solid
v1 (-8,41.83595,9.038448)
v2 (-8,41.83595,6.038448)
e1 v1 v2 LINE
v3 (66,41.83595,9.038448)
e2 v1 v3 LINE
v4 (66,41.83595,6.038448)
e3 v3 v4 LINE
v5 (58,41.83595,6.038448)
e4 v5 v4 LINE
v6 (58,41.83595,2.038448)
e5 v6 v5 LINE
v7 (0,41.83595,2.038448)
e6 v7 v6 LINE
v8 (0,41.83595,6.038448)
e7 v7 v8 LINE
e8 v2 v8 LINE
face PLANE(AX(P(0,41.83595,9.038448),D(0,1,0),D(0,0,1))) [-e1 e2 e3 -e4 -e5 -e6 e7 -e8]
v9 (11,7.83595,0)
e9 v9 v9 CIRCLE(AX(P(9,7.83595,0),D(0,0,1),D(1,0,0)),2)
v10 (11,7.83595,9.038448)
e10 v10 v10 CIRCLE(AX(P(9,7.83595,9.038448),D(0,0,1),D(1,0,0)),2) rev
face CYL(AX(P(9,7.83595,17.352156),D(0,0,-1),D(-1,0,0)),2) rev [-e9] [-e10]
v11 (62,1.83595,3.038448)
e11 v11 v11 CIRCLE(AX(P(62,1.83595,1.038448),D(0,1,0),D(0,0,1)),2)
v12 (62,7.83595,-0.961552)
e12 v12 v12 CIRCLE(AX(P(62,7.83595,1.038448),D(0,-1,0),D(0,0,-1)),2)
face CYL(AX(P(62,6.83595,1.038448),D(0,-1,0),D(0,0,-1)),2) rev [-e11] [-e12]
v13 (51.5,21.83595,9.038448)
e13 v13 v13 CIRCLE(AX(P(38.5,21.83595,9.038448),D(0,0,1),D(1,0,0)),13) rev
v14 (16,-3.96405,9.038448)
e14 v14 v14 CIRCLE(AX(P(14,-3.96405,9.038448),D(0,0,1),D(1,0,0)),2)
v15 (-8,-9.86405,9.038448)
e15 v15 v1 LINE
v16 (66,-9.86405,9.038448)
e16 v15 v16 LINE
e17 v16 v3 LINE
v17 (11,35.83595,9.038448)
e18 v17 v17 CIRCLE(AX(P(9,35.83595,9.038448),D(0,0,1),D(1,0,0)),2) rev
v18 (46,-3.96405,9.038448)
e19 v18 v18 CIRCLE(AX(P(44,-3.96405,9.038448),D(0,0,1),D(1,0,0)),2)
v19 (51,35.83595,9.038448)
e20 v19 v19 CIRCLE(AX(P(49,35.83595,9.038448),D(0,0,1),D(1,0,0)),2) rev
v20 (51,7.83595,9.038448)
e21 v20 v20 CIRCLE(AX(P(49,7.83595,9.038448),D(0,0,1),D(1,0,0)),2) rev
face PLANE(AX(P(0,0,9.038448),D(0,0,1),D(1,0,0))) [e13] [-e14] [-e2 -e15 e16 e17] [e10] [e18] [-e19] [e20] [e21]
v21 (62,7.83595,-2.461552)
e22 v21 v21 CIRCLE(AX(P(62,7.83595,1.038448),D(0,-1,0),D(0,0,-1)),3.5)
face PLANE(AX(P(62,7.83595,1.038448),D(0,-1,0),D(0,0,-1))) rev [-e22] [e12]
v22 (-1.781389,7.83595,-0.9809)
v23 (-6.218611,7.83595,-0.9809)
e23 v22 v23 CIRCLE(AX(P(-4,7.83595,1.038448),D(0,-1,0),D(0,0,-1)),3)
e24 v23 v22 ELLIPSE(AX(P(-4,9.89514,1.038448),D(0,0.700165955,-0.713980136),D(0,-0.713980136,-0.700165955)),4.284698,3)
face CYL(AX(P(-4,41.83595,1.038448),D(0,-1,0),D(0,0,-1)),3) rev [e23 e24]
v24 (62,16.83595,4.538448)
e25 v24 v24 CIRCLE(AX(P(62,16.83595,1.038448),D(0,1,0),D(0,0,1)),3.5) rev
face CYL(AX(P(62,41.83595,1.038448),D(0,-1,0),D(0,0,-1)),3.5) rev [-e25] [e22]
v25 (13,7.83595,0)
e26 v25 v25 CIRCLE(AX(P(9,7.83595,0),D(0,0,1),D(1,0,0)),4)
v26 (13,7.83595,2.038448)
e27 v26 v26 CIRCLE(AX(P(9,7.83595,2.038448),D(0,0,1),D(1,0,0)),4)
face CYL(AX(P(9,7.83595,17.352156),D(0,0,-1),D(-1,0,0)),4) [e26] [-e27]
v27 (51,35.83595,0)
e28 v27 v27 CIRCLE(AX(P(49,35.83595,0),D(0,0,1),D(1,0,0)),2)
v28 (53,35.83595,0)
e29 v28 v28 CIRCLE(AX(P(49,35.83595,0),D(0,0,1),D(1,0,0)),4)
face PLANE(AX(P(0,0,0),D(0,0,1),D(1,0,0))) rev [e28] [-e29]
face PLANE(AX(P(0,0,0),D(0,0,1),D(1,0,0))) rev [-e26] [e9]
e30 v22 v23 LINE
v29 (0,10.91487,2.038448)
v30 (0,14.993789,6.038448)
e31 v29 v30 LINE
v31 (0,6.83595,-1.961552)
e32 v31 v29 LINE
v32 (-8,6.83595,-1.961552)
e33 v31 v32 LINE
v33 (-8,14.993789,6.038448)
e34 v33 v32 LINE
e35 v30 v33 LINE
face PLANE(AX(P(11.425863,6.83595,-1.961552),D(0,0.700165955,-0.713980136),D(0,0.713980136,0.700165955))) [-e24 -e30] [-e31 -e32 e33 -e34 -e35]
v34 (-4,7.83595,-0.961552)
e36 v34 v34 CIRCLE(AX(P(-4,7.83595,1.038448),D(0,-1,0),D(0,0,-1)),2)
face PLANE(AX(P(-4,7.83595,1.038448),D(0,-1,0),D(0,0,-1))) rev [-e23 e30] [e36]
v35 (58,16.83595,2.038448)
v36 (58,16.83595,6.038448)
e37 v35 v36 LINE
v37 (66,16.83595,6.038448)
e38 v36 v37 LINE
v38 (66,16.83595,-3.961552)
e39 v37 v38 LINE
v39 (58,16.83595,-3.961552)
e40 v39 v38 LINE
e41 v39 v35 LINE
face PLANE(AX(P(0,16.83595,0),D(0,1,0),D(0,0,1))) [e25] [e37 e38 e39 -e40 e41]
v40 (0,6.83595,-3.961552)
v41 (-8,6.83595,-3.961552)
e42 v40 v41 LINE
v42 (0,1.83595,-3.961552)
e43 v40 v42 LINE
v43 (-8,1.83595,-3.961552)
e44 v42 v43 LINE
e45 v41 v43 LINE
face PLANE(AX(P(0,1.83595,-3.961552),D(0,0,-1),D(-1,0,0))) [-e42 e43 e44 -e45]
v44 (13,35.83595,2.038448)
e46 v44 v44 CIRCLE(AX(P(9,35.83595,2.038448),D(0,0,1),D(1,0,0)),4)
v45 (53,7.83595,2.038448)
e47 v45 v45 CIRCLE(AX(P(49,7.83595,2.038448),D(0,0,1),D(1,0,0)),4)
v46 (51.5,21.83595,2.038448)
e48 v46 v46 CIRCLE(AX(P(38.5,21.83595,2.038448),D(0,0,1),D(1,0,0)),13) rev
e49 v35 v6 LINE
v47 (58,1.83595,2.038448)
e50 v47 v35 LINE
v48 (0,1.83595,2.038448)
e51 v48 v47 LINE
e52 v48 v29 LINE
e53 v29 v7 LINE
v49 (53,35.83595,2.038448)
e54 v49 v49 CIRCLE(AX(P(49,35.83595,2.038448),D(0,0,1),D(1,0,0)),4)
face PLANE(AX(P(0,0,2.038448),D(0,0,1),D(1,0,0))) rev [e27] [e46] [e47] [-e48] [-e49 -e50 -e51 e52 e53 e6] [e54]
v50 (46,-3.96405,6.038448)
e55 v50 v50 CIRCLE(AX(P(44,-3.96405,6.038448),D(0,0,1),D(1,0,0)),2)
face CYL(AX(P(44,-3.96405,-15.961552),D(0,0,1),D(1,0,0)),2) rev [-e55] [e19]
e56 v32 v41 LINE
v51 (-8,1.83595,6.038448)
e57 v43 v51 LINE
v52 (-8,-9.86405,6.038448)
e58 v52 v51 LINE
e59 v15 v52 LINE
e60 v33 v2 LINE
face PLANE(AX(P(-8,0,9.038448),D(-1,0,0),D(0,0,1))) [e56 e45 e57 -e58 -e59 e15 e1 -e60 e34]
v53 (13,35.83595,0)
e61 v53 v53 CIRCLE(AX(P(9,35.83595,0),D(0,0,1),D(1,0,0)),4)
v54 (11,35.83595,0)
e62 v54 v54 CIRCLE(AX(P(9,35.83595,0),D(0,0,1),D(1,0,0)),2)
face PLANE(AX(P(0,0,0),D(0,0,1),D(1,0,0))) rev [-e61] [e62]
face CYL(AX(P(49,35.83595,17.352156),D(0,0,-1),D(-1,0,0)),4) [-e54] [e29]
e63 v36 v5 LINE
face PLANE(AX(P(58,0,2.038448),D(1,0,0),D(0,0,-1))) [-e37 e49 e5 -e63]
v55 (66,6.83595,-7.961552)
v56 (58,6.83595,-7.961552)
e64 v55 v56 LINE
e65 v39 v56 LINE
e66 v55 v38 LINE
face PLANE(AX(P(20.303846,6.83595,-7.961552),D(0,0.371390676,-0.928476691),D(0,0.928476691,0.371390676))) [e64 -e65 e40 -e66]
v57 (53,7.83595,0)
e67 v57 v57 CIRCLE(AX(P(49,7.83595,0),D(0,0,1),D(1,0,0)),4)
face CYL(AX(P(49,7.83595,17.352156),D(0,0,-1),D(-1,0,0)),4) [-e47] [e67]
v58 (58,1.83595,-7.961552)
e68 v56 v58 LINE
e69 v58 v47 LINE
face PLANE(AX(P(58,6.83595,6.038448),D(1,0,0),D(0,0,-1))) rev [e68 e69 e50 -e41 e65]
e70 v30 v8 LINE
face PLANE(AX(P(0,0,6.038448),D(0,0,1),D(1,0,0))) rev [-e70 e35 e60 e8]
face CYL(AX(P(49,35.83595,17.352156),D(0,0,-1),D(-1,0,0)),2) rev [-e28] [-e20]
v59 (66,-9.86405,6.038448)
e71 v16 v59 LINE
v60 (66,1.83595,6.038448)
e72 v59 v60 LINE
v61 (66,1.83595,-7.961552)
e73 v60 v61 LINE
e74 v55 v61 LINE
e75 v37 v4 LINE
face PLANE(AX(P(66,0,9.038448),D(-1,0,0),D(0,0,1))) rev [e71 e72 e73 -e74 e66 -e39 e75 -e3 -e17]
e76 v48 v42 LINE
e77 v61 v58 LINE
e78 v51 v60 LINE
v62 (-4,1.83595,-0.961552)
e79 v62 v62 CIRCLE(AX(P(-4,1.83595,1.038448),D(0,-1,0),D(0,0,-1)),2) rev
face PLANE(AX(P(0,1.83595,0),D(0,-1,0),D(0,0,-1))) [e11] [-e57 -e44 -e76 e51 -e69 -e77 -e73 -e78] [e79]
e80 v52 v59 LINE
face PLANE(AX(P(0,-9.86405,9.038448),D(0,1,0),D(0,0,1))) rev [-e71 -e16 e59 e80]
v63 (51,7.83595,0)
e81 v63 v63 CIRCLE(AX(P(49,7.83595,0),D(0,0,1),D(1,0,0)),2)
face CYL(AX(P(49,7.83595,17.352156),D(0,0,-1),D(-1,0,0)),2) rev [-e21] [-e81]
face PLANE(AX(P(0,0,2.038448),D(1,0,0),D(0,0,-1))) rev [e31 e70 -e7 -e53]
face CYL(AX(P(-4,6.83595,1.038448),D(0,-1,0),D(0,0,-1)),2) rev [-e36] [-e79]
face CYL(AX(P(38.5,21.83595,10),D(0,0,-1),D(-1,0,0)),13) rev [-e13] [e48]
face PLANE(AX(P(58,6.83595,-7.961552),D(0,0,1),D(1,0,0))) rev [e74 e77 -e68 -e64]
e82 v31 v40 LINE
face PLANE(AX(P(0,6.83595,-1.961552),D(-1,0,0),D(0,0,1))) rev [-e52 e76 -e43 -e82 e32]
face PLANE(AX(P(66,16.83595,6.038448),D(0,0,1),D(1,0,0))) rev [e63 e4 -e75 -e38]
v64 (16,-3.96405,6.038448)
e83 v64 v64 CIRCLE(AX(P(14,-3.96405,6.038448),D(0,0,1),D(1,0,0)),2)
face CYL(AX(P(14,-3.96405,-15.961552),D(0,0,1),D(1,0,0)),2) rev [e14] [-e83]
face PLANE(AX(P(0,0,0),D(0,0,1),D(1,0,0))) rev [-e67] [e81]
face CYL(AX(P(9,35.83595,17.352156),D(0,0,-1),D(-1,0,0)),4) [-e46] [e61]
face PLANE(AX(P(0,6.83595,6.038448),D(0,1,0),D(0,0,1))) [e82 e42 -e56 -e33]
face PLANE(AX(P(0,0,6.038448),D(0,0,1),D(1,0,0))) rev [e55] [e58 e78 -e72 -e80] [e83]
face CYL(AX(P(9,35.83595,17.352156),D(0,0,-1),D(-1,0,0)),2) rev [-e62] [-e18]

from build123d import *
from build123d.topology import SkipClean

# Parameters (mm, degrees)
SKETCH1_R               = 4
SKETCH1_R_2             = 2
BOSS_EXTRUDE2_DEPTH     = 6.038447986
BOSS_EXTRUDE2_2_DEPTH   = 6.038447986
BOSS_EXTRUDE2_3_DEPTH   = 6.038447986
BOSS_EXTRUDE2_4_DEPTH   = 6.038447986
SKETCH3_W               = 74
SKETCH3_H               = 51.7
BOSS_EXTRUDE4_DEPTH     = 3
BOSS_EXTRUDE3_START     = 11.7
SKETCH2_W               = 8
SKETCH2_H               = 8
SKETCH2_R               = 2
SKETCH2_H_2             = 14
BOSS_EXTRUDE3_DEPTH     = 5
SKETCH1_4_R             = 2
SKETCH1_4_R_2           = 13
CUT_EXTRUDE1_DEPTH      = 10
BOSS_EXTRUDE5_DEPTH     = 8
BOSS_EXTRUDE7_DEPTH     = 8
SKETCH2_2_R             = 2
CUT_EXTRUDE2_DEPTH      = 85.324276113
CUT_EXTRUDE3_START      = -6
SKETCH5_R               = 3.5
SKETCH5_R_2             = 3
CUT_EXTRUDE3_DEPTH      = 72.702596752
BOSS_EXTRUDE8_START     = -4
SKETCH3_3_W             = 58
SKETCH3_3_H             = 35
SKETCH3_3_R             = 4
SKETCH3_3_W_2           = 74
SKETCH3_3_H_2           = 5
BOSS_EXTRUDE8_DEPTH     = 4
CUT_EXTRUDE5_DEPTH      = 79.663462115
CUT_EXTRUDE5_DEPTH_BACK = 79.663462115
SKETCH1_6_R             = 13
SKETCH8_W               = 8
SKETCH8_H               = 14
SKETCH8_H_2             = 11.313736344
CUT_EXTRUDE6_DEPTH      = 25
BOSS_EXTRUDE10_START    = -8
SKETCH9_W               = 10
SKETCH9_H               = 5
BOSS_EXTRUDE10_DEPTH    = 8
SKETCH2_3_R             = 2
CUT_EXTRUDE7_DEPTH      = 25
SKETCH10_R              = 2
CUT_EXTRUDE8_DEPTH      = 25
SKETCH2_4_R             = 2
CUT_EXTRUDE9_DEPTH      = 25
SKETCH1_7_R             = 2
CUT_EXTRUDE10_DEPTH     = 25


with BuildPart() as part:
    # Sketch1 → Boss-Extrude2 (new body)
    with BuildSketch(Plane.XY):
        with Locations((49, 35.83595021)):
            Circle(SKETCH1_R)
        with Locations((49, 35.83595021)):
            Circle(SKETCH1_R_2, mode=Mode.SUBTRACT)
    extrude(amount=BOSS_EXTRUDE2_DEPTH)



with BuildPart() as body_2:
    # Sketch1 → Boss-Extrude2 2 (new body)
    with BuildSketch(Plane.XY):
        with Locations((49, 7.83595021)):
            Circle(SKETCH1_R)
        with Locations((49, 7.83595021)):
            Circle(SKETCH1_R_2, mode=Mode.SUBTRACT)
    extrude(amount=BOSS_EXTRUDE2_2_DEPTH)


with BuildPart() as body_3:
    # Sketch1 → Boss-Extrude2 3 (new body)
    with BuildSketch(Plane.XY):
        with Locations((9, 7.83595021)):
            Circle(SKETCH1_R)
        with Locations((9, 7.83595021)):
            Circle(SKETCH1_R_2, mode=Mode.SUBTRACT)
    extrude(amount=BOSS_EXTRUDE2_3_DEPTH)


with BuildPart() as body_4:
    # Sketch1 → Boss-Extrude2 4 (new body)
    with BuildSketch(Plane.XY):
        with Locations((9, 35.83595021)):
            Circle(SKETCH1_R)
        with Locations((9, 35.83595021)):
            Circle(SKETCH1_R_2, mode=Mode.SUBTRACT)
    extrude(amount=BOSS_EXTRUDE2_4_DEPTH)


with BuildPart() as part_1:
    add(part.part)

    add(body_2.part)  # Boss-Extrude4 merges body 2

    add(body_3.part)  # Boss-Extrude4 merges body 3

    add(body_4.part)  # Boss-Extrude4 merges body 4
    # Sketch3 → Boss-Extrude4 (add)
    with BuildSketch(Plane.XY.offset(6.038447986)):
        with Locations((29, 15.98595021)):
            Rectangle(SKETCH3_W, SKETCH3_H)
    extrude(amount=BOSS_EXTRUDE4_DEPTH)

    # Sketch2 → Boss-Extrude3 (add)
    # profile 1 of 2: a face of its own
    with BuildSketch(Plane(origin=(0, -9.86404979, 0), x_dir=(1, 0, 0), z_dir=(0, 1, 0)).offset(BOSS_EXTRUDE3_START)):
        with Locations((-4, -2.038447986)):
            Rectangle(SKETCH2_W, SKETCH2_H)
        with Locations(Location((-4, -1.038447986, 0), (0, 0, 270))):
            Circle(SKETCH2_R, mode=Mode.SUBTRACT)
    # profile 2 of 2: a face of its own
    with BuildSketch(Plane(origin=(0, -9.86404979, 0), x_dir=(1, 0, 0), z_dir=(0, 1, 0)).offset(BOSS_EXTRUDE3_START)):
        with Locations((62, 0.961552014)):
            Rectangle(SKETCH2_W, SKETCH2_H_2)
        with Locations(Location((62, -1.038447986, 0), (0, 0, 270))):
            Circle(SKETCH2_R, mode=Mode.SUBTRACT)
    extrude(amount=BOSS_EXTRUDE3_DEPTH)

    # Sketch1<4> → Cut-Extrude1 (cut)
    with BuildSketch(Plane.XY):
        with Locations((9, 35.83595021)):
            Circle(SKETCH1_4_R)
        with Locations((9, 7.83595021)):
            Circle(SKETCH1_4_R)
        with Locations((49, 35.83595021)):
            Circle(SKETCH1_4_R)
        with Locations((38.5, 21.83595021)):
            Circle(SKETCH1_4_R_2)
        with Locations((49, 7.83595021)):
            Circle(SKETCH1_4_R)
    extrude(amount=CUT_EXTRUDE1_DEPTH, mode=Mode.SUBTRACT)

    # Sketch4 → Boss-Extrude5 (add)
    with BuildSketch(Plane(origin=(66, 0, 0), x_dir=(0, 0, -1), z_dir=(1, 0, 0))):
        Polygon((7.961552014, 6.83595021), (-6.038447986, 41.83595021), (-6.038447986, 6.83595021), align=None)
    extrude(amount=-BOSS_EXTRUDE5_DEPTH)

    # Sketch6 → Boss-Extrude7 (add)
    with BuildSketch(Plane.ZY.offset(8)):
        Polygon((-1.961552014, 6.83595021), (6.038447986, 14.993789145), (6.038447986, 6.83595021), align=None)
    extrude(amount=-BOSS_EXTRUDE7_DEPTH)

    # Sketch2<2> → Cut-Extrude2 (cut, through all)
    with SkipClean():  # the faces are left unmerged after this step: merging them gives an invalid solid
        with BuildSketch(Plane(origin=(0, -9.86404979, 0), x_dir=(1, 0, 0), z_dir=(0, 1, 0))):
            with Locations(Location((62, -1.038447986, 0), (0, 0, 90))):
                Circle(SKETCH2_2_R)
            with Locations(Location((-4, -1.038447986, 0), (0, 0, 90))):
                Circle(SKETCH2_2_R)
        extrude(amount=CUT_EXTRUDE2_DEPTH, mode=Mode.SUBTRACT)
    add(part_1.part.scale(1), mode=Mode.REPLACE)  # the faces are merged on a copy

    # Sketch5 → Cut-Extrude3 (cut, through all)
    with SkipClean():  # the faces are left unmerged after this step: merging them gives an invalid solid
        with BuildSketch(Plane.XZ.offset(-1.83595021).offset(CUT_EXTRUDE3_START)):
            with Locations(Location((62, 1.038447986, 0), (0, 0, 270))):
                Circle(SKETCH5_R)
            with Locations((-4, 1.038447986)):
                Circle(SKETCH5_R_2)
        extrude(amount=-CUT_EXTRUDE3_DEPTH, mode=Mode.SUBTRACT)

    # Sketch3<3> → Boss-Extrude8 (add)
    # profile 1 of 2: a face of its own
    with BuildSketch(Plane.XY.offset(6.038447986).offset(BOSS_EXTRUDE8_START)):
        with Locations((29, 24.33595021)):
            Rectangle(SKETCH3_3_W, SKETCH3_3_H)
        with Locations((49, 35.83595021)):
            Circle(SKETCH3_3_R, mode=Mode.SUBTRACT)
    # profile 2 of 2: a face of its own
    with BuildSketch(Plane.XY.offset(6.038447986).offset(BOSS_EXTRUDE8_START)):
        with Locations((29, 4.33595021)):
            Rectangle(SKETCH3_3_W_2, SKETCH3_3_H_2)
    extrude(amount=BOSS_EXTRUDE8_DEPTH)

    # Sketch1<6> → Cut-Extrude5 (cut, two sides: drawn at the far end of the back side and taken through both)
    with BuildSketch(Plane.XY.offset(-CUT_EXTRUDE5_DEPTH_BACK)):
        with Locations((38.5, 21.83595021)):
            Circle(SKETCH1_6_R)
    extrude(amount=CUT_EXTRUDE5_DEPTH + CUT_EXTRUDE5_DEPTH_BACK, mode=Mode.SUBTRACT)

    # Sketch8 → Cut-Extrude6 (cut)
    with BuildSketch(Plane(origin=(0, 41.83595021, 0), x_dir=(1, 0, 0), z_dir=(0, 1, 0))):
        with Locations((62, 0.961552014)):
            Rectangle(SKETCH8_W, SKETCH8_H)
        with Locations((-4, -0.381579814)):
            Rectangle(SKETCH8_W, SKETCH8_H_2)
    extrude(amount=-CUT_EXTRUDE6_DEPTH, mode=Mode.SUBTRACT)

    # Sketch9 → Boss-Extrude10 (add)
    with BuildSketch(Plane.ZY.offset(8).offset(BOSS_EXTRUDE10_START)):
        with Locations((1.038447986, 4.33595021)):
            Rectangle(SKETCH9_W, SKETCH9_H)
    extrude(amount=BOSS_EXTRUDE10_DEPTH)

    # Sketch2<3> → Cut-Extrude7 (cut)
    with BuildSketch(Plane(origin=(0, -9.86404979, 0), x_dir=(1, 0, 0), z_dir=(0, 1, 0))):
        with Locations(Location((-4, -1.038447986, 0), (0, 0, 90))):
            Circle(SKETCH2_3_R)
    extrude(amount=CUT_EXTRUDE7_DEPTH, mode=Mode.SUBTRACT)

    # Sketch10 → Cut-Extrude8 (cut)
    with BuildSketch(Plane.XY.offset(9.038447986)):
        with Locations((44, -3.96404979)):
            Circle(SKETCH10_R)
        with Locations((14, -3.96404979)):
            Circle(SKETCH10_R)
    extrude(amount=-CUT_EXTRUDE8_DEPTH, mode=Mode.SUBTRACT)

    # Sketch2<4> → Cut-Extrude9 (cut)
    with BuildSketch(Plane(origin=(0, -9.86404979, 0), x_dir=(1, 0, 0), z_dir=(0, 1, 0))):
        with Locations(Location((62, -1.038447986, 0), (0, 0, 90))):
            Circle(SKETCH2_4_R)
    extrude(amount=CUT_EXTRUDE9_DEPTH, mode=Mode.SUBTRACT)

    # Sketch1<7> → Cut-Extrude10 (cut)
    with BuildSketch(Plane.XY):
        with Locations((9, 35.83595021)):
            Circle(SKETCH1_7_R)
        with Locations((9, 7.83595021)):
            Circle(SKETCH1_7_R)
        with Locations((49, 35.83595021)):
            Circle(SKETCH1_7_R)
        with Locations((49, 7.83595021)):
            Circle(SKETCH1_7_R)
    extrude(amount=CUT_EXTRUDE10_DEPTH, mode=Mode.SUBTRACT)


solid = part_1.part
